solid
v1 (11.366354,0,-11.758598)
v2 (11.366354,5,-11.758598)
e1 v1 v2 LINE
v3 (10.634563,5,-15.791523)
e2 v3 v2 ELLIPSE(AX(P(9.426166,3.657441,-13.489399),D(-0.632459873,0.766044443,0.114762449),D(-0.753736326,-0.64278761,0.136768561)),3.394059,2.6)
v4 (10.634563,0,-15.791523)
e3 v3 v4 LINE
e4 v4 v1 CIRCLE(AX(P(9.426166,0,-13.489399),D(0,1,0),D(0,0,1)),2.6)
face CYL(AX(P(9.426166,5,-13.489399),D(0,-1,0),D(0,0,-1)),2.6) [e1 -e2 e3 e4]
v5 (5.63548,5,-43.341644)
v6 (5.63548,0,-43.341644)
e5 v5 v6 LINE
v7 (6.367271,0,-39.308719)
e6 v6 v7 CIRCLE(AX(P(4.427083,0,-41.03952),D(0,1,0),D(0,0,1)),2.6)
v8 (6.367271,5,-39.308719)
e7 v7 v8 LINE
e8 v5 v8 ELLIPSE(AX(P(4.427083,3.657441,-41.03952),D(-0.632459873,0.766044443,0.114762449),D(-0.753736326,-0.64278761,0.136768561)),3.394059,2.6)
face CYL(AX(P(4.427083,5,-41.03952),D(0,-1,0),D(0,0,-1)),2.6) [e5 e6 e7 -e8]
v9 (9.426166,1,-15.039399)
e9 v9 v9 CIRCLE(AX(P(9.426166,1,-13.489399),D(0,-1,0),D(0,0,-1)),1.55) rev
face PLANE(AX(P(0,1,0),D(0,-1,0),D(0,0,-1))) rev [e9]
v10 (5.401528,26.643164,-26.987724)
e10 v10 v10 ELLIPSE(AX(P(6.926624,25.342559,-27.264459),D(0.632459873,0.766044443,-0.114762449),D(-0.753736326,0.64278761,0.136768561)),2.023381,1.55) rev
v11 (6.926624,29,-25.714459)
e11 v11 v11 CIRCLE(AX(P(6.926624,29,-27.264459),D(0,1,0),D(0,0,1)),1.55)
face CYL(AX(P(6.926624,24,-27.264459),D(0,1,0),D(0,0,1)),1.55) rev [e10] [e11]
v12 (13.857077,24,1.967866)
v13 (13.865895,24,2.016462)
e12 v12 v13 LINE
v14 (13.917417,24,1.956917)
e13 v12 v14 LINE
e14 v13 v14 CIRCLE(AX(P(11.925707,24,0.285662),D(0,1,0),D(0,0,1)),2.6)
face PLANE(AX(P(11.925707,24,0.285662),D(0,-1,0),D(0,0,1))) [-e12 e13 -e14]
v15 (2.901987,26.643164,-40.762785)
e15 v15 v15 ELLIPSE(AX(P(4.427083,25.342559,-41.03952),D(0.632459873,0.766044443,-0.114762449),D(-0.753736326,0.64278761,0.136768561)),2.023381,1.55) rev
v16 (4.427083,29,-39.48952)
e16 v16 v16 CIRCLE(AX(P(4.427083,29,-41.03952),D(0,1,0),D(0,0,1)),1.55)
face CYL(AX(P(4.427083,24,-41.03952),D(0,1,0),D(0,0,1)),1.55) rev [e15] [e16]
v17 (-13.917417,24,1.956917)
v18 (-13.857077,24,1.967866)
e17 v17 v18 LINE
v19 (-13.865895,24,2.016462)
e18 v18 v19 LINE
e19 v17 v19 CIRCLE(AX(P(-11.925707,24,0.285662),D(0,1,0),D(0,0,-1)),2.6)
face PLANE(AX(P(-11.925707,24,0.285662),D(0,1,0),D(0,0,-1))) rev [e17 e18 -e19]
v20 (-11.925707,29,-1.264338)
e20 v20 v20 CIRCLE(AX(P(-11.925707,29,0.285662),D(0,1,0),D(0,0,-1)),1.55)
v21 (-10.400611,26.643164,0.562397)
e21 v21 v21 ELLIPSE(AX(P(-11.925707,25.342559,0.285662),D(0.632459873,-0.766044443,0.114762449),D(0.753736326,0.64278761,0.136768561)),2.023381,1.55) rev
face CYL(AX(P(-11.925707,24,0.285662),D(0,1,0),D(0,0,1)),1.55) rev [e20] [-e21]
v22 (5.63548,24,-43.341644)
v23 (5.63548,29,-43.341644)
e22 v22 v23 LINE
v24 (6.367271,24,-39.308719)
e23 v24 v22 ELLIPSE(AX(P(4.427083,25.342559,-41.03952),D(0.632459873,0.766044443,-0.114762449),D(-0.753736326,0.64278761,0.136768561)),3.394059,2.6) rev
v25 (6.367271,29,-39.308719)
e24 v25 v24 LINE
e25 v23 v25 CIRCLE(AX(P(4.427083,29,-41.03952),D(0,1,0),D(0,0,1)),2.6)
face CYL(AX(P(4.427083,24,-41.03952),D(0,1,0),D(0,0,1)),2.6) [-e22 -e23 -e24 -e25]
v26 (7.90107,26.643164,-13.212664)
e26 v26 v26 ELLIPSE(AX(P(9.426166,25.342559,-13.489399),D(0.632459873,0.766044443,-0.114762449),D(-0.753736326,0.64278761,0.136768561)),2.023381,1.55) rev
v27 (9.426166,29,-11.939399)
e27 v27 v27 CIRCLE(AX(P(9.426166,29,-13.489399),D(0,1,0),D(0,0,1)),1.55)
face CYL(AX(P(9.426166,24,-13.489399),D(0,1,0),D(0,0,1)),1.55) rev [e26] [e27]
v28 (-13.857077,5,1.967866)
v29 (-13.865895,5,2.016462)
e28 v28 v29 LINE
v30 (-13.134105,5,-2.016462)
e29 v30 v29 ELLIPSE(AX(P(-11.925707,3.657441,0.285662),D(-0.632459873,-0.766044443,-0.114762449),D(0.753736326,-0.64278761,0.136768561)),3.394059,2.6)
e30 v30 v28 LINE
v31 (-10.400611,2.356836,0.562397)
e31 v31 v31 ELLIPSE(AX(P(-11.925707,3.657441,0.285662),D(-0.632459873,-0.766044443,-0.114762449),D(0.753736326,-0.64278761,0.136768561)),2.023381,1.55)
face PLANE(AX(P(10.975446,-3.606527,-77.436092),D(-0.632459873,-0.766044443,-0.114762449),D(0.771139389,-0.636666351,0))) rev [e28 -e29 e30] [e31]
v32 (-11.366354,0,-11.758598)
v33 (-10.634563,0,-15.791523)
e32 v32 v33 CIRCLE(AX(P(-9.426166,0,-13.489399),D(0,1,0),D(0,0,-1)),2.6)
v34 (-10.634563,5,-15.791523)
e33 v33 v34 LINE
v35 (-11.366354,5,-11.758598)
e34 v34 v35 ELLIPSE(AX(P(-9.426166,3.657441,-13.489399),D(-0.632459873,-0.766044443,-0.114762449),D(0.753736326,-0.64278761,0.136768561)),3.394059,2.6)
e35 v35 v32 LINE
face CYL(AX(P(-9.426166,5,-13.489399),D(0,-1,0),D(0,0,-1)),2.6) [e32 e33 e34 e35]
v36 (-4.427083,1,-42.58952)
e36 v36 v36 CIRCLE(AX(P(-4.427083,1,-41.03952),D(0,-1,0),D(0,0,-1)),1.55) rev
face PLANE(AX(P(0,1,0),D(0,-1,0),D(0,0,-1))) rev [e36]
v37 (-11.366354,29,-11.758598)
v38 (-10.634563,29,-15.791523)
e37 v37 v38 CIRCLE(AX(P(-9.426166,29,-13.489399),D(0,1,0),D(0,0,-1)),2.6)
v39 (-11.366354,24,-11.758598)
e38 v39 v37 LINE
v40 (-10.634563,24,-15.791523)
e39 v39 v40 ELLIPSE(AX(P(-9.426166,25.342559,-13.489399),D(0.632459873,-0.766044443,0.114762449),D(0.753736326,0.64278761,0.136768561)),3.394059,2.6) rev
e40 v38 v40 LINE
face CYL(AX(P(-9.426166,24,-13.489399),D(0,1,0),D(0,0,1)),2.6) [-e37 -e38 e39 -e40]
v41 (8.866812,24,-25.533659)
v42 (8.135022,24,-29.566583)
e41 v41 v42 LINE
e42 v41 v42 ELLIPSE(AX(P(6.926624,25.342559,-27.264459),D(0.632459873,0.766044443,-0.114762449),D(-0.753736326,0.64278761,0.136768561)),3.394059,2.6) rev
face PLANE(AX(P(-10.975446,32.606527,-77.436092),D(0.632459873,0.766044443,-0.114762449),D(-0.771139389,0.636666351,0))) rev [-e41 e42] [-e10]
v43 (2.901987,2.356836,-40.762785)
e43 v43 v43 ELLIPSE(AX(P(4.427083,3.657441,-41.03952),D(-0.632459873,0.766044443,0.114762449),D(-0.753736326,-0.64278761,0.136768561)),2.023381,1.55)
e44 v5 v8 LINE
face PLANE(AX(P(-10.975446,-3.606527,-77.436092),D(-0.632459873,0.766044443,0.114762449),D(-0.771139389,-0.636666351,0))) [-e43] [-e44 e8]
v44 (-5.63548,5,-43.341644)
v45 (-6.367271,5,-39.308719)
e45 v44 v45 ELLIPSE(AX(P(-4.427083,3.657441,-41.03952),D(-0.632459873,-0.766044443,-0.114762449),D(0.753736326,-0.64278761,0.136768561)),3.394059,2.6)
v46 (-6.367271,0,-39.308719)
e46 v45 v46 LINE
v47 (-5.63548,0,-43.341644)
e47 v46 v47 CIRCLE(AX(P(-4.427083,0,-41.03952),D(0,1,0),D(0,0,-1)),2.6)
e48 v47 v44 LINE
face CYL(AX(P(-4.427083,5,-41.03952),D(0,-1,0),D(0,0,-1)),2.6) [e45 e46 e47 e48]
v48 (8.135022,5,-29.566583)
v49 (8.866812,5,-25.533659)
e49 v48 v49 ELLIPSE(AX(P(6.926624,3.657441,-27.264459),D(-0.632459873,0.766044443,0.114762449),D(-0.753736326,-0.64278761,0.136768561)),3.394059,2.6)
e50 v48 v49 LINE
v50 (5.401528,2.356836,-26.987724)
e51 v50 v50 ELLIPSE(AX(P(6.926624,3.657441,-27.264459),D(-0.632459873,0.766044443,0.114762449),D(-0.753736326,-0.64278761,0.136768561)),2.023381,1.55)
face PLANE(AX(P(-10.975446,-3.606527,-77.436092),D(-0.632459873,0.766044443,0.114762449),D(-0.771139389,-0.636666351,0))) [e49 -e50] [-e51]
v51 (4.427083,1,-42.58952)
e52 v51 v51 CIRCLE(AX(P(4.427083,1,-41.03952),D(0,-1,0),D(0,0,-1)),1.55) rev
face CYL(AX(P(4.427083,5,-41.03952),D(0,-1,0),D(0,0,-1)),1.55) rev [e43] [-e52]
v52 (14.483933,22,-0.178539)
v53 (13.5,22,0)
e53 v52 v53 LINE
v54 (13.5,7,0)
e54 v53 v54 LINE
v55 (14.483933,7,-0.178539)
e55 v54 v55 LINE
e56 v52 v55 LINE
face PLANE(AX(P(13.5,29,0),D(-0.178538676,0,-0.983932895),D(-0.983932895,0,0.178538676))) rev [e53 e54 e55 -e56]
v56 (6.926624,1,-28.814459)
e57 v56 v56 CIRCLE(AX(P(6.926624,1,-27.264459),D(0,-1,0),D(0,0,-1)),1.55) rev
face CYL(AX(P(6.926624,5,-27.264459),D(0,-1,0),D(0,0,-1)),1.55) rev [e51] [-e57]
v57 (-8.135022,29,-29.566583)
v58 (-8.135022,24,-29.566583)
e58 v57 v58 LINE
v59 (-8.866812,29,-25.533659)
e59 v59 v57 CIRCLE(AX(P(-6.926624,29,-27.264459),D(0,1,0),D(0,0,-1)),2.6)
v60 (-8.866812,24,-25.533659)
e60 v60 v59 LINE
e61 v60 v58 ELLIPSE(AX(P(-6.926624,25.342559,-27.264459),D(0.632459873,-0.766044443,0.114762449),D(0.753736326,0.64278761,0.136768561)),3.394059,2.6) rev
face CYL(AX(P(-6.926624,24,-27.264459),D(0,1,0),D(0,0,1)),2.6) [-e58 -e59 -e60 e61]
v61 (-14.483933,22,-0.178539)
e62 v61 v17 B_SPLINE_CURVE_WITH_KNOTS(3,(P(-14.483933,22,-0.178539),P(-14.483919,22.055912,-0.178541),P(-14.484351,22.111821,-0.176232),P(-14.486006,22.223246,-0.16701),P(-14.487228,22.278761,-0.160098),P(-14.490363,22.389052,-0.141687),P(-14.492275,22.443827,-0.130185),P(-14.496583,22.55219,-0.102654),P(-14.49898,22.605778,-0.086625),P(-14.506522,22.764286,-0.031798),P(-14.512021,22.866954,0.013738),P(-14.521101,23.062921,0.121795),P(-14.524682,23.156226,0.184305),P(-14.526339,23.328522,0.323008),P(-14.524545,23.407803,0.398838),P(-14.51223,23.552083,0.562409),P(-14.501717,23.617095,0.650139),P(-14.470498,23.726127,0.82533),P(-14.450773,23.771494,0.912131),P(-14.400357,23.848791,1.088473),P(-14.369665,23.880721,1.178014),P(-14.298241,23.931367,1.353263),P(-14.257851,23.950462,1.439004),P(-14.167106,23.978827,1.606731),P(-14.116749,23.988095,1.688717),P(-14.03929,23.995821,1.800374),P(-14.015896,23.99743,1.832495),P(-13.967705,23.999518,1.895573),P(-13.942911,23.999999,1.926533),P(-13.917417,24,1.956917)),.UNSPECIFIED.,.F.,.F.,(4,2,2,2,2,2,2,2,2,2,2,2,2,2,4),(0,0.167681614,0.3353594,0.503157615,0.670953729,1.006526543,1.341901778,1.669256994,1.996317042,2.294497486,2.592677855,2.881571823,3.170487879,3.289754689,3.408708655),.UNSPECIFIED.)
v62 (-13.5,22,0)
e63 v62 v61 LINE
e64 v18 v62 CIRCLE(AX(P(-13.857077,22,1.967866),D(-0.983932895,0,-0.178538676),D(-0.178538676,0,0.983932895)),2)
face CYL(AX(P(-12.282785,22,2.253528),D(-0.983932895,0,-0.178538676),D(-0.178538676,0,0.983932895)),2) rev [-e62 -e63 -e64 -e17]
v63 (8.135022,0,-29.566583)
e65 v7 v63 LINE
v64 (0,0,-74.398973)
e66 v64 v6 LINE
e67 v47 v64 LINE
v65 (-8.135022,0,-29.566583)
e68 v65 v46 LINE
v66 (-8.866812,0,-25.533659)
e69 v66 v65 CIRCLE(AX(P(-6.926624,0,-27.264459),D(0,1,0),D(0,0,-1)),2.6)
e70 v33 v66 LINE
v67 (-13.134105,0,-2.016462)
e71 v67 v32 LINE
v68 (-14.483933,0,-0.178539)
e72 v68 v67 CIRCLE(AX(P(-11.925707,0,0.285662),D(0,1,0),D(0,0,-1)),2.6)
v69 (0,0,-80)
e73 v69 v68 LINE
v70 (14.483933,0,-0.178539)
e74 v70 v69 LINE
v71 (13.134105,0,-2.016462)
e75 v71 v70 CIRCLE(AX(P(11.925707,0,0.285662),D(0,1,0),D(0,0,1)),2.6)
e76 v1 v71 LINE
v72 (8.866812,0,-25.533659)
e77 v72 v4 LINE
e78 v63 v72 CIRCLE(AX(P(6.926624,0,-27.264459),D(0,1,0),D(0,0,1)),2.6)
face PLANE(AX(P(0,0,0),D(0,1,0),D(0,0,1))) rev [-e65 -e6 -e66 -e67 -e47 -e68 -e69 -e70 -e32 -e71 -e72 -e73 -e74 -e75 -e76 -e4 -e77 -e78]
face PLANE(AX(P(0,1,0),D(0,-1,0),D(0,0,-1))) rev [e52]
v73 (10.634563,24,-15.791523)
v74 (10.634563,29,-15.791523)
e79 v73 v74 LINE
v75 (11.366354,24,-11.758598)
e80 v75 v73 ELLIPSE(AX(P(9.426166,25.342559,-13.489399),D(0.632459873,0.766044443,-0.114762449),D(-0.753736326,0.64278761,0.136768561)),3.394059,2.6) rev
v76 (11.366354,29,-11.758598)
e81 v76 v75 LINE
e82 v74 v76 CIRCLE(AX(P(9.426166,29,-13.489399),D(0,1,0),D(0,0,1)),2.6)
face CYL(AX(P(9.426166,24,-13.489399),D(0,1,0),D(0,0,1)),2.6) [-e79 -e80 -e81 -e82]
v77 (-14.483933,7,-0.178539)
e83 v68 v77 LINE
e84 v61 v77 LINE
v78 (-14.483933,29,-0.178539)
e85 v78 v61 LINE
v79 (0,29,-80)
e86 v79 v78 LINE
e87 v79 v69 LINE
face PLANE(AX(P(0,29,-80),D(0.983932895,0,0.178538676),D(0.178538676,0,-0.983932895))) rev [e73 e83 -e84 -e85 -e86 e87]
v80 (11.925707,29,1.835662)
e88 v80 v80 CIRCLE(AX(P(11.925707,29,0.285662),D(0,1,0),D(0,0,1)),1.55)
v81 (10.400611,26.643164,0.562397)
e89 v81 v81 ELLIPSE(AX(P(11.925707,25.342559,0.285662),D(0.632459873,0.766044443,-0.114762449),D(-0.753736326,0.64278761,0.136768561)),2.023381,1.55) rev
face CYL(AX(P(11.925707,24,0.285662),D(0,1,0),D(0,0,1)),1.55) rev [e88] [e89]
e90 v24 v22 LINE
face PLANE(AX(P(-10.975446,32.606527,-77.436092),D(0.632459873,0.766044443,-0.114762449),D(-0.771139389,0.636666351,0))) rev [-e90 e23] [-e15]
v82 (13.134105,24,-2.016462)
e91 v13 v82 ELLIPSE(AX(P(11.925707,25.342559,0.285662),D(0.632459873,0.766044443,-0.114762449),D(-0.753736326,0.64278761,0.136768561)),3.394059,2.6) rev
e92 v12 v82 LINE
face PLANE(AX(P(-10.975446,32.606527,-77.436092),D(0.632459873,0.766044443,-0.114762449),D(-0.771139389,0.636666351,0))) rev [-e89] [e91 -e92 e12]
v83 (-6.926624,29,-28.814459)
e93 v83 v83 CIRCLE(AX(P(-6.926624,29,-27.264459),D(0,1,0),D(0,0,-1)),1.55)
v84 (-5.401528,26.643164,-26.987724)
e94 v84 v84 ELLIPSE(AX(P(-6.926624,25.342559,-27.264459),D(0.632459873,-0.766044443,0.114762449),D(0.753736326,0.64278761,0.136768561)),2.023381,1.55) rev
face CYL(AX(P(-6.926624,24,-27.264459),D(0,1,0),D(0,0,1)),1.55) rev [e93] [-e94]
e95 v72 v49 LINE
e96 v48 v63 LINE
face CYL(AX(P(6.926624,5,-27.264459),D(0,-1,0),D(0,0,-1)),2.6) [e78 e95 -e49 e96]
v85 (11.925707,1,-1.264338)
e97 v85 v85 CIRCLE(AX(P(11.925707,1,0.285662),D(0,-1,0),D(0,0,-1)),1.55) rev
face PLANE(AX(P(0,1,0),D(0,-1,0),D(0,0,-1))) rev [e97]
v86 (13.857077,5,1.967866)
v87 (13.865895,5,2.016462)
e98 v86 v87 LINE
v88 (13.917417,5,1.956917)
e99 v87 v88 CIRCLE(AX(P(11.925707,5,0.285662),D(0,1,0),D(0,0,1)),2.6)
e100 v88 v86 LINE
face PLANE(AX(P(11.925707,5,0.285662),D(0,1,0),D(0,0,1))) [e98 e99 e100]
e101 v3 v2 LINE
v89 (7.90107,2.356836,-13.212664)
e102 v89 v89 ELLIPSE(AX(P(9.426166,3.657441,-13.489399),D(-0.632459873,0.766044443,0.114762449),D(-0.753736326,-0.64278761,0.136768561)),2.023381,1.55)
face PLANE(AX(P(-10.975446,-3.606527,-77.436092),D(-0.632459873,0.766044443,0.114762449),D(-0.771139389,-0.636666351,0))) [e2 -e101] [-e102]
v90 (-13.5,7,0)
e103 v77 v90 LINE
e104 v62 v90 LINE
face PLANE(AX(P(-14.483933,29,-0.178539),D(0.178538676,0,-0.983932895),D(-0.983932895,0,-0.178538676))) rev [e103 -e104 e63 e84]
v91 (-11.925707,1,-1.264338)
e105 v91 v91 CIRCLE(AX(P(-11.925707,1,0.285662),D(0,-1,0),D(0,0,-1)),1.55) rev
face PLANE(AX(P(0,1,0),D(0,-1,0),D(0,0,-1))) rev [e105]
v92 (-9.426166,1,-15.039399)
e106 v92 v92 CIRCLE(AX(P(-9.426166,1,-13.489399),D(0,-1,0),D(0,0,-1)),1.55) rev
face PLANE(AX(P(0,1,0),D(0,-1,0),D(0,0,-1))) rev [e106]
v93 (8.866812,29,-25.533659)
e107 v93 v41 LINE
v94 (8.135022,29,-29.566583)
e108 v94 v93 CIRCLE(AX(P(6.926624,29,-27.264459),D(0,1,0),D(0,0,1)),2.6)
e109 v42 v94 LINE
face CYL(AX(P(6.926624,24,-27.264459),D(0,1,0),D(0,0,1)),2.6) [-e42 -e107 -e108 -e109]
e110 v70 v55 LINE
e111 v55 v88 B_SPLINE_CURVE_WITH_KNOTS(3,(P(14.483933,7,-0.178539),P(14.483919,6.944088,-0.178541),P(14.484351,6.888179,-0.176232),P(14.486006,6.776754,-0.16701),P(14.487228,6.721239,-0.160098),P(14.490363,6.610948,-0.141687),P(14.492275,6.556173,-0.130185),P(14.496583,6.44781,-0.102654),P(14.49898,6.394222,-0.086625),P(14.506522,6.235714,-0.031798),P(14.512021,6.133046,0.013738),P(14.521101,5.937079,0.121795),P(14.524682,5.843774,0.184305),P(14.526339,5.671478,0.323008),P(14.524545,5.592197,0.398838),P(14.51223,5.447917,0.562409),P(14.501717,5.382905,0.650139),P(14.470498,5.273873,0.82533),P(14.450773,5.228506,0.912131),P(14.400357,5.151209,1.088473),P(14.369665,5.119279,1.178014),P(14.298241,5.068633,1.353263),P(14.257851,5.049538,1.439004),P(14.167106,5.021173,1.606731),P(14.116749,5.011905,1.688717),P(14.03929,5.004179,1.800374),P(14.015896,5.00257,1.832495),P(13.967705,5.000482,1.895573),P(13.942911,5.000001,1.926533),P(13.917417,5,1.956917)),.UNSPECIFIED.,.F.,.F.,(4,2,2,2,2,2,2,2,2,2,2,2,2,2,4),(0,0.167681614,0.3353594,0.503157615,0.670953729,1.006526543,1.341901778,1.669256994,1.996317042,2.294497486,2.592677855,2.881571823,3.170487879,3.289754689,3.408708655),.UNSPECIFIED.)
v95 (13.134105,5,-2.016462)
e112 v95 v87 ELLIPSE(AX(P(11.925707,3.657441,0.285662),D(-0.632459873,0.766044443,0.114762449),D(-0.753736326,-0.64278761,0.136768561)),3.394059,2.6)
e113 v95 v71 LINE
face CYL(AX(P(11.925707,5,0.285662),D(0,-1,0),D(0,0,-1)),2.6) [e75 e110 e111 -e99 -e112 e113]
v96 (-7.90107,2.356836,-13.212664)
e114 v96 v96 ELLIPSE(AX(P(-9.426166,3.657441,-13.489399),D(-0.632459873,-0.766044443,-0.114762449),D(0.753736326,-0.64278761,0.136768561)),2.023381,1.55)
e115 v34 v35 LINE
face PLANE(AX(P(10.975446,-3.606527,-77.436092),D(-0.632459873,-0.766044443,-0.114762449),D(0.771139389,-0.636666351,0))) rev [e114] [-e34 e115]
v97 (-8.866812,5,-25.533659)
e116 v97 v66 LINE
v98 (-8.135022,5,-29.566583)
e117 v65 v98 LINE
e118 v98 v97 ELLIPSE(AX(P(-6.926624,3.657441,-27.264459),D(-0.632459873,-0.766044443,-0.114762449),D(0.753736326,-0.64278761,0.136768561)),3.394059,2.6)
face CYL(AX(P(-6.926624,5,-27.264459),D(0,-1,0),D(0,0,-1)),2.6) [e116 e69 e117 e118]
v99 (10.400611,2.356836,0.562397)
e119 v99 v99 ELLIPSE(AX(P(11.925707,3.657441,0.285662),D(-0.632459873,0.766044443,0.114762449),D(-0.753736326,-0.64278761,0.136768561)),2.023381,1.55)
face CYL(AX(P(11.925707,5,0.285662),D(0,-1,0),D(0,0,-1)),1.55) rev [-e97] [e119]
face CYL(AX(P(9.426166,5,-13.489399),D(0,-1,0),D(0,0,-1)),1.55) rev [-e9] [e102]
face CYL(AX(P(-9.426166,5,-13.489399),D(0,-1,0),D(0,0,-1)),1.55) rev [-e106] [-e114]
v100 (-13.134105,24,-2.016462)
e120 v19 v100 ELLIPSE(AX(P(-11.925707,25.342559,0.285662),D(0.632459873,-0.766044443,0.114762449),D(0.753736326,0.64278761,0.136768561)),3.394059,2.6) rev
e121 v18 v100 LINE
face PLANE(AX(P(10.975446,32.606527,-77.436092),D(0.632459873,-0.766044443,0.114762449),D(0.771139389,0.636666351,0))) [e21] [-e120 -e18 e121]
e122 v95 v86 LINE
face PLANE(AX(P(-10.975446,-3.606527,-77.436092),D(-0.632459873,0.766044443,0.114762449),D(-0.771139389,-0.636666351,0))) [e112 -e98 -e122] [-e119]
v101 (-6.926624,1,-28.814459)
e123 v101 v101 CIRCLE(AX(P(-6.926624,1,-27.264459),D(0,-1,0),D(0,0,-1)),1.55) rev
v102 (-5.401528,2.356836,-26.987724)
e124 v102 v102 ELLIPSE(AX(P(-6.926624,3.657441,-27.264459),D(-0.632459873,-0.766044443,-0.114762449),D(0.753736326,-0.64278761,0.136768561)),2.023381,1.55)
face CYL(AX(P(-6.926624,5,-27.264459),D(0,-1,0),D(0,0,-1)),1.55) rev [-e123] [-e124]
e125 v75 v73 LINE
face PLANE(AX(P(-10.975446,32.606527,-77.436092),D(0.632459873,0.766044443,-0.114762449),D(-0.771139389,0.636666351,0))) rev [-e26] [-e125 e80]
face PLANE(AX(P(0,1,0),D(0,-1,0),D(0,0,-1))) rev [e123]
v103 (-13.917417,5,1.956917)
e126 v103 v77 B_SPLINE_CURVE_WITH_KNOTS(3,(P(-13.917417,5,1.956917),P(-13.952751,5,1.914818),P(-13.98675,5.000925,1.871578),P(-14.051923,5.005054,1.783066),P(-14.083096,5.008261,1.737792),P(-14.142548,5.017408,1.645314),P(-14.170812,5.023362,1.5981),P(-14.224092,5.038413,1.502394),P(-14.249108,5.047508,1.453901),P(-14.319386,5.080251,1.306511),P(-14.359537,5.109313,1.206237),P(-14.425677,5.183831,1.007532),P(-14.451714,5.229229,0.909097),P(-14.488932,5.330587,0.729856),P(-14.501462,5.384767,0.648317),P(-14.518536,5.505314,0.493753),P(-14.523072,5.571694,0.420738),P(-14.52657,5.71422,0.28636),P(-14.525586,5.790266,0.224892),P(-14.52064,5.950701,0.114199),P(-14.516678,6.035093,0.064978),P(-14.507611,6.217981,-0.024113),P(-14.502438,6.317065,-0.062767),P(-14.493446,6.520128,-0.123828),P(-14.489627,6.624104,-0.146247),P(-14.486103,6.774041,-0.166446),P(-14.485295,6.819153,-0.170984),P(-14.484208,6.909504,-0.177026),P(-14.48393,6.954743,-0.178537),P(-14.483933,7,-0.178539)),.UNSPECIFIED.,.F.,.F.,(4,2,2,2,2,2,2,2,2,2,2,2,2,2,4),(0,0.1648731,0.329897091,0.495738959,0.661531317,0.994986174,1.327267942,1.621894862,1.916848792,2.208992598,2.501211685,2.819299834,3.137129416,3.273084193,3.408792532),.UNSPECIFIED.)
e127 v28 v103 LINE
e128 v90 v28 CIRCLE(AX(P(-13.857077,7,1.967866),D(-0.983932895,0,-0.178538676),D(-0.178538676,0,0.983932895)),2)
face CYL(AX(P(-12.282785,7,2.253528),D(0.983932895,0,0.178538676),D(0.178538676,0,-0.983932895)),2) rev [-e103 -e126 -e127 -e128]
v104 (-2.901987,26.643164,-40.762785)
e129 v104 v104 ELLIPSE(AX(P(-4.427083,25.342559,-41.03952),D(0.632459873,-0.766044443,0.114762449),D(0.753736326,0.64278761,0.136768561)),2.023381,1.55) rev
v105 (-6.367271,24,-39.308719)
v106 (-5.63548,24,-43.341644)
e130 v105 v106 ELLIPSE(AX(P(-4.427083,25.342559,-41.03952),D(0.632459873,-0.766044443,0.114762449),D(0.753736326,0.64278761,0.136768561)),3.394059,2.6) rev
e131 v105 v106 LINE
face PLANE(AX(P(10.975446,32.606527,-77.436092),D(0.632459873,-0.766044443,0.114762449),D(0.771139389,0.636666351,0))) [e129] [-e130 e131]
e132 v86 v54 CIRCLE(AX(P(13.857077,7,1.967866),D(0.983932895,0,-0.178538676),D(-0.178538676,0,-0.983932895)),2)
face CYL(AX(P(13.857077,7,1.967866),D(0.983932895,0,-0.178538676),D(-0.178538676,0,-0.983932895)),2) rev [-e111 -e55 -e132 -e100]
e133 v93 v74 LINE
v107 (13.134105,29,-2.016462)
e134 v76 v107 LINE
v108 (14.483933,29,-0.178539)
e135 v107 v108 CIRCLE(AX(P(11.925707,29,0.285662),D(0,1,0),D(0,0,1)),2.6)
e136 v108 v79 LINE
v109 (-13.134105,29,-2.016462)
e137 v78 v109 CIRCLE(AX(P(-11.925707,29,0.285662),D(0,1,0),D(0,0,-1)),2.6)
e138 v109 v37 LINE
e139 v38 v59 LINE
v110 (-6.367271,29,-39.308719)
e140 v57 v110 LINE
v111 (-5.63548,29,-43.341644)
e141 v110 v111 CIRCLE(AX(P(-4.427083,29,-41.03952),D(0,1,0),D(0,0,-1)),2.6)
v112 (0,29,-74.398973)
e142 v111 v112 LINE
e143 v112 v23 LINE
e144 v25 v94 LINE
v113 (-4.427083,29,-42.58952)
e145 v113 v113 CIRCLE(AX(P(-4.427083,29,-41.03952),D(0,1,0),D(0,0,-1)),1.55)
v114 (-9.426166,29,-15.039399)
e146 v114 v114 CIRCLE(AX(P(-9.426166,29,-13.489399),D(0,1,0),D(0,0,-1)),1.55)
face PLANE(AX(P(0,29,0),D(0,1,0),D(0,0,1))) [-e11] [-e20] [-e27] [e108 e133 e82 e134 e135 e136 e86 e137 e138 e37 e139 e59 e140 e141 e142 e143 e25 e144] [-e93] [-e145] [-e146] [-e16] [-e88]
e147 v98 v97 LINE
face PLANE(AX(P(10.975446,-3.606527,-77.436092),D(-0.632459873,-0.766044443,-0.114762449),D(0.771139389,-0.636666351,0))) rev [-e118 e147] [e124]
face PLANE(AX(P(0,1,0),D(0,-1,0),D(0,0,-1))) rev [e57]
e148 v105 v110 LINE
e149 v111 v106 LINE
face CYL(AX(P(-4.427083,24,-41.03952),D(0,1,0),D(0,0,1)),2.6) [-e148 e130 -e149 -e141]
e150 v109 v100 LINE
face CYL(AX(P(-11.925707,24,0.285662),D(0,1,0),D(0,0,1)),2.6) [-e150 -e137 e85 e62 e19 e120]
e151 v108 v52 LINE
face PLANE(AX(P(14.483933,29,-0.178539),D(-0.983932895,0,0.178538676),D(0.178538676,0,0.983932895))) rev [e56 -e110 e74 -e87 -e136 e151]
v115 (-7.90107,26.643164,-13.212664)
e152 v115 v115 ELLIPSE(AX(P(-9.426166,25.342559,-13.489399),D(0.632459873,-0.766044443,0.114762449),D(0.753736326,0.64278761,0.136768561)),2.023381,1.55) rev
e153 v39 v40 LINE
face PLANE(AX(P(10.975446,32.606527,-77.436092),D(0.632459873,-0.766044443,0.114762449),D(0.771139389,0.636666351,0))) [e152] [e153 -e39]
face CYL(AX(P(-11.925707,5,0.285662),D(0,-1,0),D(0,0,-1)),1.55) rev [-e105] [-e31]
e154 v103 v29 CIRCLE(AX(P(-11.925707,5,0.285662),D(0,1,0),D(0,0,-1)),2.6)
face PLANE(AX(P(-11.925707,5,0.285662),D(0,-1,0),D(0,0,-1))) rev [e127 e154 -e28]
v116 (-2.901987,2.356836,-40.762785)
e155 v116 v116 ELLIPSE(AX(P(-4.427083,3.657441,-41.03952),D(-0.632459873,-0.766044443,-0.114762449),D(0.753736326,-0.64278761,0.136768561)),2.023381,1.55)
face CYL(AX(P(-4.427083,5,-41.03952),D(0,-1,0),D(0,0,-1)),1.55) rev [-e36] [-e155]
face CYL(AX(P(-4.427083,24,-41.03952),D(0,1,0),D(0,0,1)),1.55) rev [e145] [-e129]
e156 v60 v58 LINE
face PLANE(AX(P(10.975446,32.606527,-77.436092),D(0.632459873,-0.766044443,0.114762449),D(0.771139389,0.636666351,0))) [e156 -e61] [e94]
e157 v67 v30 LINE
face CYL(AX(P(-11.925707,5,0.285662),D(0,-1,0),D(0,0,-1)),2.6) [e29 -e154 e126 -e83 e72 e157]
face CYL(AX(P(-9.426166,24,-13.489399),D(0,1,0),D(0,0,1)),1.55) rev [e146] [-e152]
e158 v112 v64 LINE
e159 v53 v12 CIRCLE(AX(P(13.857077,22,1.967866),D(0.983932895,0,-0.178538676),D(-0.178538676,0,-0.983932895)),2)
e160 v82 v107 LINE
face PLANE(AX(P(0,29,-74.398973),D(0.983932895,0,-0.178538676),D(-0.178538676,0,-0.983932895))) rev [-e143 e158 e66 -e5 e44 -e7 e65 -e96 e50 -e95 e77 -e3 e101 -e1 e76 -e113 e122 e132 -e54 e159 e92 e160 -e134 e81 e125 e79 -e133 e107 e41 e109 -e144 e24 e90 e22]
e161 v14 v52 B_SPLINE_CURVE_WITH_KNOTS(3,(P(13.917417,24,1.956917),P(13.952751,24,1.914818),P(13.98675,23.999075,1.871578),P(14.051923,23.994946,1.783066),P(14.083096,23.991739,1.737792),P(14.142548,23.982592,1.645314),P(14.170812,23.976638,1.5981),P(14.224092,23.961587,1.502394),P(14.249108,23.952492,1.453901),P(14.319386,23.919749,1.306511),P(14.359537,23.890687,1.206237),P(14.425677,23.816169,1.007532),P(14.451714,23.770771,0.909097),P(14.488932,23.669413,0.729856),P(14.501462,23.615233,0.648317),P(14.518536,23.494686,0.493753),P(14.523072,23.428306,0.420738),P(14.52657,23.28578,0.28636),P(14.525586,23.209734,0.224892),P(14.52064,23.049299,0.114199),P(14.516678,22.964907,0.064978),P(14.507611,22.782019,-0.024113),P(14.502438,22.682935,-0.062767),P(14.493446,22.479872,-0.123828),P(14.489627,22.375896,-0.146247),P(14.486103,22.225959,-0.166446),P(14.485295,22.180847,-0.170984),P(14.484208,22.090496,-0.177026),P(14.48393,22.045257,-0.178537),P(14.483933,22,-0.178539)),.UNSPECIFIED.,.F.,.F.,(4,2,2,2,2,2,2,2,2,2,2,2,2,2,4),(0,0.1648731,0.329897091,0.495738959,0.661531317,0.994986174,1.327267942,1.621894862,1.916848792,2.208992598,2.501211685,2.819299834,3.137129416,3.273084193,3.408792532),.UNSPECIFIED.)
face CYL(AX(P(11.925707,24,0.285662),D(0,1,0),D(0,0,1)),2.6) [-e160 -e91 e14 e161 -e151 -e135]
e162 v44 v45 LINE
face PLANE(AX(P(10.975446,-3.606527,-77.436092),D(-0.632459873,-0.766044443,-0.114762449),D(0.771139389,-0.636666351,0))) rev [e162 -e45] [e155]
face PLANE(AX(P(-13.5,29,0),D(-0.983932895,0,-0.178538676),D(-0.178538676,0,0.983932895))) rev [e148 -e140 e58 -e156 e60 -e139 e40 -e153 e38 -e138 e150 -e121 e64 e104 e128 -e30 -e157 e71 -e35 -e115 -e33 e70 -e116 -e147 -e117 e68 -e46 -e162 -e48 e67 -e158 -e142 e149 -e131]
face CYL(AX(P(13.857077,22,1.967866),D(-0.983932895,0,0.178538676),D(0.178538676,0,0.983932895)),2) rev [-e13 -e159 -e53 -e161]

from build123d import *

# Parameters (mm, degrees)
BOSS_EXTRUDE1_DEPTH            = 29
SKETCH2_R                      = 2.6
SKETCH2_R_2                    = 1.55
BOSS_EXTRUDE3_DEPTH            = 5
CUT_EXTRUDE1_REACH             = 90.599
CUT_EXTRUDE1_DIRECTION_2_DEPTH = 89.598840586
CUT_EXTRUDE2_REACH             = 90.599
CUT_EXTRUDE2_DIRECTION_2_DEPTH = 89.598840586
FILLET1_R                      = 2
SKETCH6_R                      = 2.6
BOSS_EXTRUDE4_DEPTH            = 1


with BuildPart() as part:
    # Sketch1 → Boss-Extrude1 (new body)
    with BuildSketch(Plane(origin=(0, 0, 0), x_dir=(1, 0, 0), z_dir=(0, 1, 0))):
        Polygon((-13.5, 0), (0, 74.39897269), (13.5, 0), (14.483932895, 0.178538676), (0, 80), (-14.483932895, 0.178538676), align=None)
    extrude(amount=BOSS_EXTRUDE1_DEPTH)

    # Sketch2 → Boss-Extrude3 (add)
    # profile 1 of 8: a face of its own
    with BuildSketch(Plane(origin=(0, 0, 0), x_dir=(1, 0, 0), z_dir=(0, 1, 0))):
        with Locations((11.925707369, -0.285661882)):
            Circle(SKETCH2_R)
        with Locations(Location((11.925707369, -0.285661882, 0), (0, 0, 270))):
            Circle(SKETCH2_R_2, mode=Mode.SUBTRACT)
    # profile 2 of 8: a face of its own
    with BuildSketch(Plane(origin=(0, 0, 0), x_dir=(1, 0, 0), z_dir=(0, 1, 0))):
        with Locations((9.426165905, 13.489398644)):
            Circle(SKETCH2_R)
        with Locations(Location((9.426165905, 13.489398644, 0), (0, 0, 270))):
            Circle(SKETCH2_R_2, mode=Mode.SUBTRACT)
    # profile 3 of 8: a face of its own
    with BuildSketch(Plane(origin=(0, 0, 0), x_dir=(1, 0, 0), z_dir=(0, 1, 0))):
        with Locations((6.926624441, 27.264459169)):
            Circle(SKETCH2_R)
        with Locations(Location((6.926624441, 27.264459169, 0), (0, 0, 270))):
            Circle(SKETCH2_R_2, mode=Mode.SUBTRACT)
    # profile 4 of 8: a face of its own
    with BuildSketch(Plane(origin=(0, 0, 0), x_dir=(1, 0, 0), z_dir=(0, 1, 0))):
        with Locations((4.427082978, 41.039519694)):
            Circle(SKETCH2_R)
        with Locations(Location((4.427082978, 41.039519694, 0), (0, 0, 270))):
            Circle(SKETCH2_R_2, mode=Mode.SUBTRACT)
    # profile 5 of 8: a face of its own
    with BuildSketch(Plane(origin=(0, 0, 0), x_dir=(1, 0, 0), z_dir=(0, 1, 0))):
        with Locations((-11.925707369, -0.285661882)):
            Circle(SKETCH2_R)
        with Locations(Location((-11.925707369, -0.285661882, 0), (0, 0, 90))):
            Circle(SKETCH2_R_2, mode=Mode.SUBTRACT)
    # profile 6 of 8: a face of its own
    with BuildSketch(Plane(origin=(0, 0, 0), x_dir=(1, 0, 0), z_dir=(0, 1, 0))):
        with Locations((-9.426165905, 13.489398644)):
            Circle(SKETCH2_R)
        with Locations(Location((-9.426165905, 13.489398644, 0), (0, 0, 90))):
            Circle(SKETCH2_R_2, mode=Mode.SUBTRACT)
    # profile 7 of 8: a face of its own
    with BuildSketch(Plane(origin=(0, 0, 0), x_dir=(1, 0, 0), z_dir=(0, 1, 0))):
        with Locations((-6.926624441, 27.264459169)):
            Circle(SKETCH2_R)
        with Locations(Location((-6.926624441, 27.264459169, 0), (0, 0, 90))):
            Circle(SKETCH2_R_2, mode=Mode.SUBTRACT)
    # profile 8 of 8: a face of its own
    with BuildSketch(Plane(origin=(0, 0, 0), x_dir=(1, 0, 0), z_dir=(0, 1, 0))):
        with Locations((-4.427082978, 41.039519694)):
            Circle(SKETCH2_R)
        with Locations(Location((-4.427082978, 41.039519694, 0), (0, 0, 90))):
            Circle(SKETCH2_R_2, mode=Mode.SUBTRACT)
    boss_extrude3 = extrude(amount=BOSS_EXTRUDE3_DEPTH)

    # Cut-Extrude1: up to this face of the body (flat: up to its plane)
    cut_extrude1_end = Plane(part.part.faces().sort_by_distance((-6.66752213, 14.905805763, -37.654024776))[0])
    # Sketch4 → Cut-Extrude1 (cut, up to the picked face)
    with BuildSketch(Plane(origin=(0.430326794, 0, 2.371546029), x_dir=(0.9839328946538309, 0, -0.17853867597283662), z_dir=(0.17853867597283662, 0, 0.9839328946538309)), mode=Mode.PRIVATE) as cut_extrude1_sk1:
        Polygon((13.283094078, 5), (9.083094078, 5), (9.083094078, 1.475781549), align=None)
    cut_extrude1_tool1 = split(extrude(cut_extrude1_sk1.sketch, amount=-CUT_EXTRUDE1_REACH, mode=Mode.PRIVATE), bisect_by=cut_extrude1_end, keep=Keep.BOTH, mode=Mode.PRIVATE)
    cut_extrude1 = cut_extrude1_tool1.solids().sort_by(Axis((10.744988, 3.825261, 0.499908), (-0.17853867597283662, 0, -0.9839328946538309)))[0]
    add(cut_extrude1, mode=Mode.SUBTRACT)

    # Sketch4 → Cut-Extrude1 direction 2 (cut)
    with BuildSketch(Plane(origin=(0.430326794, 0, 2.371546029), x_dir=(0.9839328946538309, 0, -0.17853867597283662), z_dir=(0.17853867597283662, 0, 0.9839328946538309))):
        Polygon((13.283094078, 5), (9.083094078, 5), (9.083094078, 1.475781549), align=None)
    cut_extrude1_direction_2 = extrude(amount=CUT_EXTRUDE1_DIRECTION_2_DEPTH, mode=Mode.SUBTRACT)

    # Cut-Extrude2: up to this face of the body (flat: up to its plane)
    cut_extrude2_end = Plane(part.part.faces().sort_by_distance((6.66752213, 14.905805763, -37.654024776))[0])
    # Sketch5 → Cut-Extrude2 (cut, up to the picked face)
    with BuildSketch(Plane(origin=(-0.430326794, 0, 2.371546029), x_dir=(0.9839328946538308, 0, 0.17853867597283732), z_dir=(-0.17853867597283732, 0, 0.9839328946538308)), mode=Mode.PRIVATE) as cut_extrude2_sk1:
        Polygon((-9.083094078, 5), (-9.083094078, 1.475781549), (-13.283094078, 5), align=None)
    cut_extrude2_tool1 = split(extrude(cut_extrude2_sk1.sketch, amount=-CUT_EXTRUDE2_REACH, mode=Mode.PRIVATE), bisect_by=cut_extrude2_end, keep=Keep.BOTH, mode=Mode.PRIVATE)
    cut_extrude2 = cut_extrude2_tool1.solids().sort_by(Axis((-10.744988, 3.825261, 0.499908), (0.17853867597283732, 0, -0.9839328946538308)))[0]
    add(cut_extrude2, mode=Mode.SUBTRACT)

    # Sketch5 → Cut-Extrude2 direction 2 (cut)
    with BuildSketch(Plane(origin=(-0.430326794, 0, 2.371546029), x_dir=(0.9839328946538308, 0, 0.17853867597283732), z_dir=(-0.17853867597283732, 0, 0.9839328946538308))):
        Polygon((-9.083094078, 5), (-9.083094078, 1.475781549), (-13.283094078, 5), align=None)
    cut_extrude2_direction_2 = extrude(amount=CUT_EXTRUDE2_DIRECTION_2_DEPTH, mode=Mode.SUBTRACT)

    # Mirror2: Boss-Extrude3, Cut-Extrude1, Cut-Extrude1 direction 2, Cut-Extrude2, Cut-Extrude2 direction 2 across plane
    add(boss_extrude3.mirror(Plane.ZX.offset(14.5)))
    add(cut_extrude1.mirror(Plane.ZX.offset(14.5)), mode=Mode.SUBTRACT)
    add(cut_extrude1_direction_2.mirror(Plane.ZX.offset(14.5)), mode=Mode.SUBTRACT)
    add(cut_extrude2.mirror(Plane.ZX.offset(14.5)), mode=Mode.SUBTRACT)
    add(cut_extrude2_direction_2.mirror(Plane.ZX.offset(14.5)), mode=Mode.SUBTRACT)

    # Fillet1
    # the kernel refuses this fillet: 2 mm, written as the material it adds along each edge
    with BuildSketch(Plane(origin=(13.5, 5, 0), x_dir=(0, 1, 0), z_dir=(0.9839328946538308, 0, -0.17853867597283668))) as fillet1_piece_1_section:
        with BuildLine():
            CenterArc((FILLET1_R, FILLET1_R), FILLET1_R, 180, 90)
            Line((0, FILLET1_R), (0, 0))
            Line((0, 0), (FILLET1_R, 0))
        make_face()
    fillet1_piece_1 = extrude(amount=6, mode=Mode.PRIVATE)
    fillet1_piece_1 = fillet1_piece_1 & Plane(origin=(11.925707369, 5.699977743, 0.285661882), x_dir=(1, 0, 0), z_dir=(0, -1, 0)) * Cylinder(2.6, 20, mode=Mode.PRIVATE)
    add(fillet1_piece_1)
    with BuildSketch(Plane(origin=(13.5, 24, 0), x_dir=(0, -1, 0), z_dir=(0.9839328946538308, 0, -0.17853867597283668))) as fillet1_piece_2_section:
        with BuildLine():
            CenterArc((FILLET1_R, -FILLET1_R), FILLET1_R, 90, 90)
            Line((0, -FILLET1_R), (0, 0))
            Line((0, 0), (FILLET1_R, 0))
        make_face()
    fillet1_piece_2 = extrude(amount=6, mode=Mode.PRIVATE)
    fillet1_piece_2 = fillet1_piece_2 & Plane(origin=(11.925707369, 23.300022258, 0.285661882), x_dir=(1, 0, 0), z_dir=(0, 1, 0)) * Cylinder(2.6, 20, mode=Mode.PRIVATE)
    add(fillet1_piece_2)
    with BuildSketch(Plane(origin=(-19.403597368, 24, -1.071232056), x_dir=(0, -1, 0), z_dir=(0.9839328946538307, 0, 0.17853867597283735))) as fillet1_piece_3_section:
        with BuildLine():
            CenterArc((FILLET1_R, -FILLET1_R), FILLET1_R, 90, 90)
            Line((0, -FILLET1_R), (0, 0))
            Line((0, 0), (FILLET1_R, 0))
        make_face()
    fillet1_piece_3 = extrude(amount=6, mode=Mode.PRIVATE)
    fillet1_piece_3 = fillet1_piece_3 & Plane(origin=(-11.925707369, 23.777637105, 0.285661882), x_dir=(1, 0, 0), z_dir=(0, 1, 0)) * Cylinder(2.6, 21, mode=Mode.PRIVATE)
    add(fillet1_piece_3)
    with BuildSketch(Plane(origin=(-19.403597368, 5, -1.071232056), x_dir=(-0.17853867597283735, 0, 0.9839328946538307), z_dir=(0.9839328946538307, 0, 0.17853867597283735))) as fillet1_piece_4_section:
        with BuildLine():
            CenterArc((FILLET1_R, -FILLET1_R), FILLET1_R, 90, 90)
            Line((0, -FILLET1_R), (0, 0))
            Line((0, 0), (FILLET1_R, 0))
        make_face()
    fillet1_piece_4 = extrude(amount=6, mode=Mode.PRIVATE)
    fillet1_piece_4 = fillet1_piece_4 & Plane(origin=(-11.925707369, 5.222362792, 0.285661882), x_dir=(1, 0, 0), z_dir=(0, -1, 0)) * Cylinder(2.6, 21, mode=Mode.PRIVATE)
    add(fillet1_piece_4)

    # Sketch6 → Boss-Extrude4 (add)
    with BuildSketch(Plane.XZ):
        with Locations((4.427082978, -41.039519694)):
            Circle(SKETCH6_R)
        with Locations((-4.427082978, -41.039519694)):
            Circle(SKETCH6_R)
        with Locations((-6.926624441, -27.264459169)):
            Circle(SKETCH6_R)
        with Locations((11.925707369, 0.285661882)):
            Circle(SKETCH6_R)
        with Locations((6.926624441, -27.264459169)):
            Circle(SKETCH6_R)
        with Locations((9.426165905, -13.489398644)):
            Circle(SKETCH6_R)
        with Locations((-9.426165905, -13.489398644)):
            Circle(SKETCH6_R)
        with Locations((-11.925707369, 0.285661882)):
            Circle(SKETCH6_R)
    extrude(amount=-BOSS_EXTRUDE4_DEPTH)


solid = part.part
